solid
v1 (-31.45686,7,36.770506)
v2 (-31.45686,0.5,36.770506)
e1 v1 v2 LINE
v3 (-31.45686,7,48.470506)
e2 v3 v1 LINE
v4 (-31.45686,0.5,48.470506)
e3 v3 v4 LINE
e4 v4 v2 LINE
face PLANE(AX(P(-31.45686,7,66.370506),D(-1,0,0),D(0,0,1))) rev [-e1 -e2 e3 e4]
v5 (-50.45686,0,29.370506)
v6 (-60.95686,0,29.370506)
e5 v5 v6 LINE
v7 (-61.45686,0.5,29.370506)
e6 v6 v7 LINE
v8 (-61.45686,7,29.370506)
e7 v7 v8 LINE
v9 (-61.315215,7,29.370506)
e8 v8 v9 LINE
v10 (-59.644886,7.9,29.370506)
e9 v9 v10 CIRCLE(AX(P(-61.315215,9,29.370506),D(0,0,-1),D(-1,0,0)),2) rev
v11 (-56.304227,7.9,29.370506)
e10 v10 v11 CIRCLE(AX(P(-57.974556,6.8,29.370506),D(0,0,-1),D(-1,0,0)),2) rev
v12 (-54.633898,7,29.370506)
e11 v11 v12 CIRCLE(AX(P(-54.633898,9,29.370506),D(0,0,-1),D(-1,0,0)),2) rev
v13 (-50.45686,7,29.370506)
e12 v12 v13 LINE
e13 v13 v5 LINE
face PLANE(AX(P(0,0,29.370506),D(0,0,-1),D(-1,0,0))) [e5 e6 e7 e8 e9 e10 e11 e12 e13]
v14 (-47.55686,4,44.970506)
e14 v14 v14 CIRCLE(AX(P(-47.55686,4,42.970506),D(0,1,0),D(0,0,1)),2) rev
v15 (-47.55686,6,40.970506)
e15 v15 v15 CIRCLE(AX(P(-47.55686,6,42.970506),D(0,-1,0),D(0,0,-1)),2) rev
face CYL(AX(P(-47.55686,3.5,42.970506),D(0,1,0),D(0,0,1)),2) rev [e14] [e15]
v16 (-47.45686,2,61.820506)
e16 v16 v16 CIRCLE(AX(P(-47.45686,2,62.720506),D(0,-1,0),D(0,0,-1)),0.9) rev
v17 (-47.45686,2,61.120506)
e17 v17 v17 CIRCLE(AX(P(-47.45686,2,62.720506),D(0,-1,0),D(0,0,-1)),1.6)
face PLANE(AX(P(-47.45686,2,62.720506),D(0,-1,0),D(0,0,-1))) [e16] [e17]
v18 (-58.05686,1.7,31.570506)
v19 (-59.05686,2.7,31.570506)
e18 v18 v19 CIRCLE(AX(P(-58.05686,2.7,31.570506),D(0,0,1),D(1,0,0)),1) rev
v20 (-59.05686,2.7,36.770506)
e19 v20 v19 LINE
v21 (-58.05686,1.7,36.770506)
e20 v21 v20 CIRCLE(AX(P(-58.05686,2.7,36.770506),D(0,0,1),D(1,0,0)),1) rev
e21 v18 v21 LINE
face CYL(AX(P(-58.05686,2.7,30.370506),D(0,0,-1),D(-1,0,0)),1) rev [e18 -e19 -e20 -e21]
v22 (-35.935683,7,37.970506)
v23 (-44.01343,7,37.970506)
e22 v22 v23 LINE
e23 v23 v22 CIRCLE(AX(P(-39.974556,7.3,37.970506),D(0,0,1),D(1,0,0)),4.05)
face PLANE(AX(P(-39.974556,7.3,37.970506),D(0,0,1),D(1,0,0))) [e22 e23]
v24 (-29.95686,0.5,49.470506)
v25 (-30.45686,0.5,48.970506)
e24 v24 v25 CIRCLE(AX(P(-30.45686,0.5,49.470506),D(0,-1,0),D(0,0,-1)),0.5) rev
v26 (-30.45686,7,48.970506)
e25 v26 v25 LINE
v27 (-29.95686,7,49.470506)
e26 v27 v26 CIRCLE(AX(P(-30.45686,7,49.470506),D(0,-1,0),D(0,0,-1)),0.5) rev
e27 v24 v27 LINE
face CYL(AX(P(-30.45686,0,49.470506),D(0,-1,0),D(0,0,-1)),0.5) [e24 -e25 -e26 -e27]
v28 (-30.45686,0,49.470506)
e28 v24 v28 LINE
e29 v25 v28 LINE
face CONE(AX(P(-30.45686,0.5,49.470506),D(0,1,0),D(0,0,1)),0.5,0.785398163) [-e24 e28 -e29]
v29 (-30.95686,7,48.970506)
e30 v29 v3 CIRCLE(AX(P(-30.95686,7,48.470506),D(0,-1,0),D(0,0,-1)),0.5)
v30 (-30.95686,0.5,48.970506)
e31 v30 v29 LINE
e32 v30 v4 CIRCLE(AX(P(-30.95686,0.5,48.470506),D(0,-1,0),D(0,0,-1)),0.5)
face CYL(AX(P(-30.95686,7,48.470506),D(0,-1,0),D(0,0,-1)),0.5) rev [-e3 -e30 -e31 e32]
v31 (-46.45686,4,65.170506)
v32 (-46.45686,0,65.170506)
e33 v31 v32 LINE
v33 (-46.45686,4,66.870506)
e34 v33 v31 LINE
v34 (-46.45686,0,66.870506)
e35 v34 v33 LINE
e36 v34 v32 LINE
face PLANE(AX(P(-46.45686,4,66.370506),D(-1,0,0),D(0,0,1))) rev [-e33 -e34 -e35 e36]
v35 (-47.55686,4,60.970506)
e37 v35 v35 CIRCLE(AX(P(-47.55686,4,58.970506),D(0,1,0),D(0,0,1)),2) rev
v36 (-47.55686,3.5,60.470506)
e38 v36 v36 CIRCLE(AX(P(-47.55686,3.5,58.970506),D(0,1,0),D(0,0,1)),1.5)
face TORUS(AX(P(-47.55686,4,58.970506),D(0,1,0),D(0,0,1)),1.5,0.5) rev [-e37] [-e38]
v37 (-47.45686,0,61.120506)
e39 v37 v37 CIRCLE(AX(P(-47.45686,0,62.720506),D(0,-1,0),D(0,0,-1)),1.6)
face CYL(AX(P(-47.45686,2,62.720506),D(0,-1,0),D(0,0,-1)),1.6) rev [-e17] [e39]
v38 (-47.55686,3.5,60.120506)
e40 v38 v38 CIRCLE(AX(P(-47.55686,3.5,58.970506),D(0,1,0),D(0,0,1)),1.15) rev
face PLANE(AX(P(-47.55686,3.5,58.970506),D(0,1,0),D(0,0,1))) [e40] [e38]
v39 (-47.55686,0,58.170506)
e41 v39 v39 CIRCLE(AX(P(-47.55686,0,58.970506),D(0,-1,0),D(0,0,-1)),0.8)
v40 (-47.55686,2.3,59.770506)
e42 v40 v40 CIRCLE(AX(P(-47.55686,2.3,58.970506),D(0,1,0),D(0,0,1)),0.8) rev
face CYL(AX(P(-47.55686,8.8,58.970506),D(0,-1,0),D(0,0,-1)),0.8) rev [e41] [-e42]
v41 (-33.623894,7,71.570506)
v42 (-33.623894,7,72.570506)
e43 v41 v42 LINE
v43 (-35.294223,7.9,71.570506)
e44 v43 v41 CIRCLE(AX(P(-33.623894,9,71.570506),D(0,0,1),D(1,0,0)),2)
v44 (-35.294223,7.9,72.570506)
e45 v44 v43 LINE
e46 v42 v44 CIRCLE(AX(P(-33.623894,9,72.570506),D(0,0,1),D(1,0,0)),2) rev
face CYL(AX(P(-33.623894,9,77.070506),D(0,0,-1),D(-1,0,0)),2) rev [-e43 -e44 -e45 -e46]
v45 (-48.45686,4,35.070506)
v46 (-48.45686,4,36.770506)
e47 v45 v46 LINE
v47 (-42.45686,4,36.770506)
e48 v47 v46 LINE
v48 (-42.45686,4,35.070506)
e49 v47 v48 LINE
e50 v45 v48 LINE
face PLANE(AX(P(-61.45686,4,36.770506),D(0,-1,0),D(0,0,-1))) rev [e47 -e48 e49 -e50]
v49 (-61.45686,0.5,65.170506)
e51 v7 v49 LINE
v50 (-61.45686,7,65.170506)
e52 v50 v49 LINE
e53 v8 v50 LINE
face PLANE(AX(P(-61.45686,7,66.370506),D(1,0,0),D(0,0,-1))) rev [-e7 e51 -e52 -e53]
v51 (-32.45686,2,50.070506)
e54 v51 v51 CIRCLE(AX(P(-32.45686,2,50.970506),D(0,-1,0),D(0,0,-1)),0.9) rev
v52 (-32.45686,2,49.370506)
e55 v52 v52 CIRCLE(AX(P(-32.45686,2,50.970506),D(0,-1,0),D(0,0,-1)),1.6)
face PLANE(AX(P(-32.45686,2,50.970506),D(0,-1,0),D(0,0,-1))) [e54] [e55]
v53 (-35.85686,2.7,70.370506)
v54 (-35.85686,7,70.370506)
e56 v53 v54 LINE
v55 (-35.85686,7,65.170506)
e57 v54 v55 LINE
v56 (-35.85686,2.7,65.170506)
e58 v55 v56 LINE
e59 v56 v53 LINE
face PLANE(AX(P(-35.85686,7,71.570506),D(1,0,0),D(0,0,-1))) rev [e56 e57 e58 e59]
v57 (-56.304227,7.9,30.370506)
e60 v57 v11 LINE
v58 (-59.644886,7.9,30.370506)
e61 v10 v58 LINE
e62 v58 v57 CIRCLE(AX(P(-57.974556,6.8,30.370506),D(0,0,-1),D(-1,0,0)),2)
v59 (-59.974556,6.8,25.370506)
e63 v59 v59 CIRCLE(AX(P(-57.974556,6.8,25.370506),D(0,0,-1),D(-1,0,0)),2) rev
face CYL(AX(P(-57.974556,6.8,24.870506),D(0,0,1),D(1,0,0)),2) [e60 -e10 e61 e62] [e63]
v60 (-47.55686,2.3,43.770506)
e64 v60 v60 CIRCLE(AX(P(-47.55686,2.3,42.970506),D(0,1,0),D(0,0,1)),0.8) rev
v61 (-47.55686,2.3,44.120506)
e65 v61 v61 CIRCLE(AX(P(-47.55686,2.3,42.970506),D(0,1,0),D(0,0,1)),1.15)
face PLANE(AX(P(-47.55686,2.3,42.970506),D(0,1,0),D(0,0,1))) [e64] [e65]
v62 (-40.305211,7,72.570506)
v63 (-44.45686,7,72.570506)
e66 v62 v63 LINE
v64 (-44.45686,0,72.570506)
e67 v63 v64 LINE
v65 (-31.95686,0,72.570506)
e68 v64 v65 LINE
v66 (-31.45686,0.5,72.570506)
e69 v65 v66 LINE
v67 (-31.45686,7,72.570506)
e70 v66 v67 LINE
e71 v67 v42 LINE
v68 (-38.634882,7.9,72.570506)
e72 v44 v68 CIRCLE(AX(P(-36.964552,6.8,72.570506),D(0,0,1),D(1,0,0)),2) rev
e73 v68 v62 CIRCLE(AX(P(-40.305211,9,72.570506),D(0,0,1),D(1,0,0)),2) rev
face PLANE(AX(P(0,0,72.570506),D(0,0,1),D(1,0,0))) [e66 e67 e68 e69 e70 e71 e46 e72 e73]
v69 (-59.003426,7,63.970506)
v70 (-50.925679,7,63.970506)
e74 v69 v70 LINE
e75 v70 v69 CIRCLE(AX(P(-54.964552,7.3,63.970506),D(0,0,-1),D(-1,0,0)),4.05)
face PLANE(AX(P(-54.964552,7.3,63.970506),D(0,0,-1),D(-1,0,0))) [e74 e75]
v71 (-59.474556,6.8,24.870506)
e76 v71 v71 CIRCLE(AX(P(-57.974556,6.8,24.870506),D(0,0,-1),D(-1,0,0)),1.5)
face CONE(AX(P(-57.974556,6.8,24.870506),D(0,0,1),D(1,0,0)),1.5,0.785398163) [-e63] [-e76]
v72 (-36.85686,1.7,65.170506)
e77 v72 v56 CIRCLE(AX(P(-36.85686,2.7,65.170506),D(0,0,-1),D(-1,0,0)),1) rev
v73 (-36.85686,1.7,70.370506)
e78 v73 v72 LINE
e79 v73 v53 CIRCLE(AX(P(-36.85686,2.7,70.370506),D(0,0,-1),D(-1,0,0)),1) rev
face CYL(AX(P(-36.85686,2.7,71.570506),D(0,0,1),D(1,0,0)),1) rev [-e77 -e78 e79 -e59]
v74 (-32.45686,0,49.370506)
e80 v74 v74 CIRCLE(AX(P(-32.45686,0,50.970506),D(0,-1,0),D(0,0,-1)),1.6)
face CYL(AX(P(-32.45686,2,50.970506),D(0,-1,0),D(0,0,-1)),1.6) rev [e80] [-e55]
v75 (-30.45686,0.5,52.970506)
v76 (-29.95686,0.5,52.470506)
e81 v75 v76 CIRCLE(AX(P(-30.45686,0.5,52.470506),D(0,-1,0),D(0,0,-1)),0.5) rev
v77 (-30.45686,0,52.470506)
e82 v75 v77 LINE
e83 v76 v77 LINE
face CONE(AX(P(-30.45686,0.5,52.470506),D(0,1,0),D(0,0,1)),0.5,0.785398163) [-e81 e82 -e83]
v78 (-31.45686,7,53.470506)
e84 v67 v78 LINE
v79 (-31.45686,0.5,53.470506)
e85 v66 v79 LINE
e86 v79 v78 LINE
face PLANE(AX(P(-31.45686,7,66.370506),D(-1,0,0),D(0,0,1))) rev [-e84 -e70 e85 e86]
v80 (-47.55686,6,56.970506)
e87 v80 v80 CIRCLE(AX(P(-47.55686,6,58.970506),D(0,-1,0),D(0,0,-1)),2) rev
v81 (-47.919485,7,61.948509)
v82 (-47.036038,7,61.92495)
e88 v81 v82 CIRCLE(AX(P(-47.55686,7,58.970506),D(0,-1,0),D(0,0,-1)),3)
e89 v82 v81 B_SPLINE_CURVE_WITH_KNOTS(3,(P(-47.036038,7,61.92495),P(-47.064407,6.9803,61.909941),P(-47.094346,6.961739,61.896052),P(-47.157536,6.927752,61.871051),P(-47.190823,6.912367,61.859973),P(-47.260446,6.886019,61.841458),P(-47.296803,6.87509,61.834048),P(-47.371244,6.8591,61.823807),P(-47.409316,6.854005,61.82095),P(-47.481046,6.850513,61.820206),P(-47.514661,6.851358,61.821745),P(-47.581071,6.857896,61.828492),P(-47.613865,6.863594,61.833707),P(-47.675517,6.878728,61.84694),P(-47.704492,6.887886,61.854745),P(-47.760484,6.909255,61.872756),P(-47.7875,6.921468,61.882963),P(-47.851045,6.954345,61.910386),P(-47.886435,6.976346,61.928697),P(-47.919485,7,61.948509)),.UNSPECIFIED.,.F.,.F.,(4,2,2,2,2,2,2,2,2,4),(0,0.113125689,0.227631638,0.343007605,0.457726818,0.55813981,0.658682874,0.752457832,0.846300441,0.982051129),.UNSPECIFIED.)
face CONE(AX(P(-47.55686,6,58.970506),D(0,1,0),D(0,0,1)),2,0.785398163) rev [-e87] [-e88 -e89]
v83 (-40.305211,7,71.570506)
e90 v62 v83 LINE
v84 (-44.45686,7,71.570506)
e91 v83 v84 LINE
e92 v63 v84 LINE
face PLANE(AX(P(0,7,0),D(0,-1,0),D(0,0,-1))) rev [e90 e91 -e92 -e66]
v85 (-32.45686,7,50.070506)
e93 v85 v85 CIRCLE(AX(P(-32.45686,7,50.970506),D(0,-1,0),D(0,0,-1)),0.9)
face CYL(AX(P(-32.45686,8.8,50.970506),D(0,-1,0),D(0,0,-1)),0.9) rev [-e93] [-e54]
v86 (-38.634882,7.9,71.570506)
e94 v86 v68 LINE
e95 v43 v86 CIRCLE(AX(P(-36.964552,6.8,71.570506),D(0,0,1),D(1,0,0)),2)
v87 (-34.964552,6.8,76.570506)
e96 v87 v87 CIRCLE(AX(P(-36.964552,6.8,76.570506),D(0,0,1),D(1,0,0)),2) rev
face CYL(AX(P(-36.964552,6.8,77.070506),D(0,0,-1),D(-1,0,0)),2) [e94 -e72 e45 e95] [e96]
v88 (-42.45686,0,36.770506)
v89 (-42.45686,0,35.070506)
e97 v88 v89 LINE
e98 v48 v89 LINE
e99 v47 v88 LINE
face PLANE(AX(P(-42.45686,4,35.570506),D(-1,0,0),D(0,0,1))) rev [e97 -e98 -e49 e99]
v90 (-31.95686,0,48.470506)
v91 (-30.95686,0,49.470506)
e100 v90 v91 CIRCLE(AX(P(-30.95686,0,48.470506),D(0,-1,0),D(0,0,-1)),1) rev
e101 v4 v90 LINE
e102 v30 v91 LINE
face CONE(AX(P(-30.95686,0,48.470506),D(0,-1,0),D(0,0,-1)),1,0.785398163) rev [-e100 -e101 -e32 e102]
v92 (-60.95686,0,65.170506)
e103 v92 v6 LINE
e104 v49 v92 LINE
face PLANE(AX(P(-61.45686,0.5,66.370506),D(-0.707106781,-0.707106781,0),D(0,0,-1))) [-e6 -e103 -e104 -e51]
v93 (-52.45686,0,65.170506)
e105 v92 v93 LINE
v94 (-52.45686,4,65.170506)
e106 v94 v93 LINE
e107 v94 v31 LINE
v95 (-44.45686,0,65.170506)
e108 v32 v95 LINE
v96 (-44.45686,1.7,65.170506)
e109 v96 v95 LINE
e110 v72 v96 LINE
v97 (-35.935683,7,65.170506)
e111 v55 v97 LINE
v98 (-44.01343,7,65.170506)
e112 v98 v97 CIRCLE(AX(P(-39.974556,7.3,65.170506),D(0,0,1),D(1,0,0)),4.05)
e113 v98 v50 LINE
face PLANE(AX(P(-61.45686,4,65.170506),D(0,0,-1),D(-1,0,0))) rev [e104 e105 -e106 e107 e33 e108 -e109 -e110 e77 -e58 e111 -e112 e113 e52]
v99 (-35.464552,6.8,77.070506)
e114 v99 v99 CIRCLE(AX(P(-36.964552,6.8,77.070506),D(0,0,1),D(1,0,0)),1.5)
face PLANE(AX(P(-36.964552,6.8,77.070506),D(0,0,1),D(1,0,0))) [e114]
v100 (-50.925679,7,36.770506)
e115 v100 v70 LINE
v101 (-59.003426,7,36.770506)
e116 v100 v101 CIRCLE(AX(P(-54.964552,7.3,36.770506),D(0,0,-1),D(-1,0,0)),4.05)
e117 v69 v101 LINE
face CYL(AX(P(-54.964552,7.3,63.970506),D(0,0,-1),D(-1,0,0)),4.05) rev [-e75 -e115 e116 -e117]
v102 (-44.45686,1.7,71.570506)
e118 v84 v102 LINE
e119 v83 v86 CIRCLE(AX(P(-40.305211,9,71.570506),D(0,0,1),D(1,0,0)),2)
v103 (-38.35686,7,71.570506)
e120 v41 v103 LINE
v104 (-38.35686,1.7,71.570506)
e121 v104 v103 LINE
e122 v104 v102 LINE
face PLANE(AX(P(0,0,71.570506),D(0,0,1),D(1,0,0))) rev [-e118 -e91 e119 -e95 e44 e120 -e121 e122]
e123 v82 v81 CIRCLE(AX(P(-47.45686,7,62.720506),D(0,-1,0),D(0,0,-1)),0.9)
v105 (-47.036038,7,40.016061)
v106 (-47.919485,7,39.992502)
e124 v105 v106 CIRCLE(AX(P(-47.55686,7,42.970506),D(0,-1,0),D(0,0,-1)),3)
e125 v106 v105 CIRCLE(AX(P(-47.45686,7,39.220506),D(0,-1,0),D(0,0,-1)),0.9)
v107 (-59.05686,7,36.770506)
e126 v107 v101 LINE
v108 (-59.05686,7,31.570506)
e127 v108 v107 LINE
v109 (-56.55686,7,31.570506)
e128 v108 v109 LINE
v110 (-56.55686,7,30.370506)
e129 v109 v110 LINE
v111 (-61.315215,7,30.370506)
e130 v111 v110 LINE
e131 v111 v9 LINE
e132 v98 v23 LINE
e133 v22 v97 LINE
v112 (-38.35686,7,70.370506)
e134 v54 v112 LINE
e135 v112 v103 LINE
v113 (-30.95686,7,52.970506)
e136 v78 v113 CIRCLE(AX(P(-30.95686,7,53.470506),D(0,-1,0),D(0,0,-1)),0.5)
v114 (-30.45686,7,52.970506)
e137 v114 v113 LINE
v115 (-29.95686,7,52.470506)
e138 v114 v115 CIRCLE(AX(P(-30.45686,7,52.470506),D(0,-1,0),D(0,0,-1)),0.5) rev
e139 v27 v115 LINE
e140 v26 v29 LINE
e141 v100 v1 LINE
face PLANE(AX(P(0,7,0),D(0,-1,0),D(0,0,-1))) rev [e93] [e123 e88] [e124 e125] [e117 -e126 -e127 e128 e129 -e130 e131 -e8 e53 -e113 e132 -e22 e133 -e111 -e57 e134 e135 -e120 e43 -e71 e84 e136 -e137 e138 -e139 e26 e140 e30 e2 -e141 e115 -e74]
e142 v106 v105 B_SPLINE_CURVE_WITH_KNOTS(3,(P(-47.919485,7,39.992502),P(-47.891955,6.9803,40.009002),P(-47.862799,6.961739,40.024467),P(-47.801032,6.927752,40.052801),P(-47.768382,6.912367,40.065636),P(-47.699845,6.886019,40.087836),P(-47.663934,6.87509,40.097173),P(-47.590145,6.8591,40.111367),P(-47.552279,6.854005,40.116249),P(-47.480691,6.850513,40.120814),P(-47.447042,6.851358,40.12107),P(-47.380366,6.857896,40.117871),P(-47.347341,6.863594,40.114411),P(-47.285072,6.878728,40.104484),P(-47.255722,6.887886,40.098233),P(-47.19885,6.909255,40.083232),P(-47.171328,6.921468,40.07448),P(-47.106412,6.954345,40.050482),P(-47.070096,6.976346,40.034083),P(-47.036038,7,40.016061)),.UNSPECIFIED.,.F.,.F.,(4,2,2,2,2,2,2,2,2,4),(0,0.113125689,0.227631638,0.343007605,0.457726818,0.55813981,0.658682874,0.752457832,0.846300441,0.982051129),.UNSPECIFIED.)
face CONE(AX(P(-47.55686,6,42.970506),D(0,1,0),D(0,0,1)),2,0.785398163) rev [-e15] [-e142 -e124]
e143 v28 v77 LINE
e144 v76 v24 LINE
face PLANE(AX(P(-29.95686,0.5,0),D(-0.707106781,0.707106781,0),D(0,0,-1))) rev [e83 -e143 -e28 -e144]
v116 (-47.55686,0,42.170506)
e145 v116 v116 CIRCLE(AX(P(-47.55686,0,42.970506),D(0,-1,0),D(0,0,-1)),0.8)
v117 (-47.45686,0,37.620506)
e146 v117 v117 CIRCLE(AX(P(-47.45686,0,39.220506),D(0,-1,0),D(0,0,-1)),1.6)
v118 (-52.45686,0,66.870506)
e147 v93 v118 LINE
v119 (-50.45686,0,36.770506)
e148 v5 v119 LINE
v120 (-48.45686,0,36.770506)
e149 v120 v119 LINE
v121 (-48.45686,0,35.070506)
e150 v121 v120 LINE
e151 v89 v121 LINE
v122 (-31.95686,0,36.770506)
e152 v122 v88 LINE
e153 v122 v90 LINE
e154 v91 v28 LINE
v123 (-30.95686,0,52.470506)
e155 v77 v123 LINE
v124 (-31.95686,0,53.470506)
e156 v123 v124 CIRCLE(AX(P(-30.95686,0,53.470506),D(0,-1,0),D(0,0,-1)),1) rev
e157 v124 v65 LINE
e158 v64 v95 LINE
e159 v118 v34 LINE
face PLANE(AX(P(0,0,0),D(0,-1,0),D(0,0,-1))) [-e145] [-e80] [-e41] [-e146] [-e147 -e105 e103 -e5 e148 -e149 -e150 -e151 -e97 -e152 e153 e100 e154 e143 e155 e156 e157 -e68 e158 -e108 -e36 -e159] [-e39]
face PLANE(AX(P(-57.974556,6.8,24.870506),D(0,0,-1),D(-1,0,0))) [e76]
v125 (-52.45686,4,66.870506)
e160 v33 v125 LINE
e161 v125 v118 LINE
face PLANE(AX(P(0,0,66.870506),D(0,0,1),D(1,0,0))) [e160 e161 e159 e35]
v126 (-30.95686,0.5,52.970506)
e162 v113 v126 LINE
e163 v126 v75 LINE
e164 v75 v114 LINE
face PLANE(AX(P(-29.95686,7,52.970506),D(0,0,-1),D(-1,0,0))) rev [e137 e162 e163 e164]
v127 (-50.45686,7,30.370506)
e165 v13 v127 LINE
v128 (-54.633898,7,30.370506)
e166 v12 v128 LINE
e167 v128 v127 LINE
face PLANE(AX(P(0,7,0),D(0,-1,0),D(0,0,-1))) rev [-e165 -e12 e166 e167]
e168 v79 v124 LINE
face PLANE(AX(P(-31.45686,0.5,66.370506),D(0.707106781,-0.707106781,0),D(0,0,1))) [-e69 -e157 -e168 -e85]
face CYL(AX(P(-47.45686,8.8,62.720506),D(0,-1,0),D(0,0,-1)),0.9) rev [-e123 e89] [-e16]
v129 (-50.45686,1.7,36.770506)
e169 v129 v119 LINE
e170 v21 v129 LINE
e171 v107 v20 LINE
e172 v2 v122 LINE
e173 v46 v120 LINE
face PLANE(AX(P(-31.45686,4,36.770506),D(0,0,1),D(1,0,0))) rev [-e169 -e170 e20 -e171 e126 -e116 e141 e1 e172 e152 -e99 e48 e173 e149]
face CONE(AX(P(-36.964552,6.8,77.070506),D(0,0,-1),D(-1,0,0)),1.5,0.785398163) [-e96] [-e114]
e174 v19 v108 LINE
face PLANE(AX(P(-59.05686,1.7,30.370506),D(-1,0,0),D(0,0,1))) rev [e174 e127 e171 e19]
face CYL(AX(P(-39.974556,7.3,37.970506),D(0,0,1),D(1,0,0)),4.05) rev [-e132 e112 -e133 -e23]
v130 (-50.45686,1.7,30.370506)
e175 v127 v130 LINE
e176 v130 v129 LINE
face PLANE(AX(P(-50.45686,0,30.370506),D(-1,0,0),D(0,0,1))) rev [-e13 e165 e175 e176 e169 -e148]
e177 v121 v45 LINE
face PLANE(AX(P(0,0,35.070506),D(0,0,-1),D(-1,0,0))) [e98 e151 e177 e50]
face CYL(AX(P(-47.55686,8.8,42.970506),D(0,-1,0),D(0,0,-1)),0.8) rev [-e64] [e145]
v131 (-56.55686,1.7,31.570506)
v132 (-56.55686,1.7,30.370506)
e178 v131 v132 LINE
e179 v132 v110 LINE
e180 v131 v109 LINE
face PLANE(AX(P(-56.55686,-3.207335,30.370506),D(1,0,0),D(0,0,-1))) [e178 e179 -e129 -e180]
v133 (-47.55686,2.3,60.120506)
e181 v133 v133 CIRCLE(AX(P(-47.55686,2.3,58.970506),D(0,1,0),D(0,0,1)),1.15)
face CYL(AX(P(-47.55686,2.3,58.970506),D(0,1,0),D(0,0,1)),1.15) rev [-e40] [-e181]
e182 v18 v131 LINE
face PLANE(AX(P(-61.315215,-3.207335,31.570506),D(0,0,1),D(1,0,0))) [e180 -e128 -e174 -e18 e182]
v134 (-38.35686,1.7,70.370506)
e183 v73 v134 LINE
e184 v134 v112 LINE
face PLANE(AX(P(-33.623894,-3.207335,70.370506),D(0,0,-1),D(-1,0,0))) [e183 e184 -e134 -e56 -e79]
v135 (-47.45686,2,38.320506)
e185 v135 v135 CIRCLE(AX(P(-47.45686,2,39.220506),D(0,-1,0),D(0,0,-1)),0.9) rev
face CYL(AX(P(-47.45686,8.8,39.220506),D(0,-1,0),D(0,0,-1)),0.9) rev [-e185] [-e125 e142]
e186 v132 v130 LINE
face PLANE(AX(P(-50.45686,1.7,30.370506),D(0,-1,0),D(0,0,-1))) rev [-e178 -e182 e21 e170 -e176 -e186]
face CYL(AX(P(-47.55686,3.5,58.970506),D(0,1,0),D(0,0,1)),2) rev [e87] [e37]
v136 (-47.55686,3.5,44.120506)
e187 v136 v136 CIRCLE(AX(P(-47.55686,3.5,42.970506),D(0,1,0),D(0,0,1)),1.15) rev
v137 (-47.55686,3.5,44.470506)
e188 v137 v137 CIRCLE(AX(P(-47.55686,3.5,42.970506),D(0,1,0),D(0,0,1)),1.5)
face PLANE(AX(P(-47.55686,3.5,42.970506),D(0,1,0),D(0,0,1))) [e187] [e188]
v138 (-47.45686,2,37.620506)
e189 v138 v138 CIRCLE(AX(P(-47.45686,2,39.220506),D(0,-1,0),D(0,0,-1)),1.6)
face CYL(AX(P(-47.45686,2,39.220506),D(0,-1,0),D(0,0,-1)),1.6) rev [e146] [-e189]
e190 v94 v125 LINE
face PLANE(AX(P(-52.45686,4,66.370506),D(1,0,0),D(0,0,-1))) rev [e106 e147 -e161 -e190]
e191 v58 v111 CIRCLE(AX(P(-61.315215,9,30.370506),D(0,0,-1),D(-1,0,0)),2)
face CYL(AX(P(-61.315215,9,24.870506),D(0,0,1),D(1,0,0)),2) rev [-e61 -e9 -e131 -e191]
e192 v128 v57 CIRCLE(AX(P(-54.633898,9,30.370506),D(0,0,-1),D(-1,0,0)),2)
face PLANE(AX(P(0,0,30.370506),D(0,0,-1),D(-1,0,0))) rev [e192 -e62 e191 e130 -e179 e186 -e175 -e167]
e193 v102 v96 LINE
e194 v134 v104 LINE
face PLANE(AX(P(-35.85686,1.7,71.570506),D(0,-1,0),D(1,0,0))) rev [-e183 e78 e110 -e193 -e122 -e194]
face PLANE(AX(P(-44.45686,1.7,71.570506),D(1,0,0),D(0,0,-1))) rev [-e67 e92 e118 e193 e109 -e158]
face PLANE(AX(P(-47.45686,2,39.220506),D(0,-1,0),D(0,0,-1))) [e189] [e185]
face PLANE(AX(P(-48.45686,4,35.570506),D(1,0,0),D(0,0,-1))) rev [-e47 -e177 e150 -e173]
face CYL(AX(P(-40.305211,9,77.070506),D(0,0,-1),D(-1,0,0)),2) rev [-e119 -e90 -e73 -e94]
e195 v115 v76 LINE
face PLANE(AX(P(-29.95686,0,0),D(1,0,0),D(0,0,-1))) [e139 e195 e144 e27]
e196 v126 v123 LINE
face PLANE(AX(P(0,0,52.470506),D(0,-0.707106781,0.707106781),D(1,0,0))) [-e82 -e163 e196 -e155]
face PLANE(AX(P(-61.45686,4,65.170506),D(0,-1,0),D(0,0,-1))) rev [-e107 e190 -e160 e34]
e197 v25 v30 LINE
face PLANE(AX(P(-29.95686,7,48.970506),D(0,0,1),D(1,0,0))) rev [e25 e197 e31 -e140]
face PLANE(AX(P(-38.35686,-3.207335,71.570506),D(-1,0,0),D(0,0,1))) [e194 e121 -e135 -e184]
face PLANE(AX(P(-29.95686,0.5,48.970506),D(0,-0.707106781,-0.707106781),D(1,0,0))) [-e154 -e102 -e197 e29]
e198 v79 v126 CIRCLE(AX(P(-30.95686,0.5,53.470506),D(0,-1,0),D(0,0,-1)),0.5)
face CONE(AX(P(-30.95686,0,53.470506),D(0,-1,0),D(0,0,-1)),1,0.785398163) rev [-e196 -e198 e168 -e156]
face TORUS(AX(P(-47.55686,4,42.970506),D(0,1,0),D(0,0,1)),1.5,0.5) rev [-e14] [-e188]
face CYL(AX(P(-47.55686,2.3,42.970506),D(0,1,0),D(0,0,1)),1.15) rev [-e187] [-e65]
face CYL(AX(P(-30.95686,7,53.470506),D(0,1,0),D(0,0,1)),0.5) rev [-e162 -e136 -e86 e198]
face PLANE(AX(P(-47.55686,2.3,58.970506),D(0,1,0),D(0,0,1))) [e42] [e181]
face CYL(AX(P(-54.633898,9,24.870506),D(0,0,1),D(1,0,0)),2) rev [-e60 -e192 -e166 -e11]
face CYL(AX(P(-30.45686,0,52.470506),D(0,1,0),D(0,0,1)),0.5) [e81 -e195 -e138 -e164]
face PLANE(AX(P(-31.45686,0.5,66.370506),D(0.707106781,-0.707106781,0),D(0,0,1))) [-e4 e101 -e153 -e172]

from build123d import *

# Parameters (mm, degrees)
SKETCH1_W            = 30
SKETCH1_H            = 30.8
BOSS_EXTRUDE1_DEPTH  = 7
SKETCH2_R            = 4.05
CUT_EXTRUDE1_DEPTH   = 6.5
SKETCH3_W            = 15
SKETCH3_H            = 1.2
SKETCH3_W_2          = 9
SKETCH3_W_3          = 11
SKETCH3_W_4          = 13
CUT_EXTRUDE2_DEPTH   = 4
SKETCH4_W            = 30
SKETCH4_H            = 3
CUT_EXTRUDE3_DEPTH   = 1.2
SKETCH5_W            = 30
SKETCH5_H            = 3
CUT_EXTRUDE4_DEPTH   = 1.2
SKETCH6_R            = 4.05
CUT_EXTRUDE5_DEPTH   = 27.2
SKETCH7_R            = 4.05
CUT_EXTRUDE6_DEPTH   = 27.2
BOSS_EXTRUDE2_DEPTH  = 6.4
FILLET1_R            = 1
BOSS_EXTRUDE3_DEPTH  = 6.4
FILLET2_R            = 1
SKETCH13_W           = 13
SKETCH13_H           = 7
BOSS_EXTRUDE4_DEPTH  = 1
SKETCH14_W           = 11
SKETCH14_H           = 7
BOSS_EXTRUDE5_DEPTH  = 1
SKETCH15_R           = 2
BOSS_EXTRUDE8_DEPTH  = 5.5
SKETCH16_R           = 2
BOSS_EXTRUDE9_DEPTH  = 5.5
FILLET3_R            = 2
FILLET4_R            = 2
FILLET5_R            = 2
CHAMFER2_SIZE        = 0.5
CHAMFER3_SIZE        = 0.5
SKETCH17_W           = 4
SKETCH17_H           = 7
BOSS_EXTRUDE10_DEPTH = 1.5
FILLET7_R            = 0.5
SKETCH18_R           = 0.9
CUT_EXTRUDE9_DEPTH   = 99.965895754
SKETCH19_R           = 1.6
CUT_EXTRUDE10_DEPTH  = 2
SKETCH20_R           = 0.9
CUT_EXTRUDE11_DEPTH  = 99.965895754
SKETCH21_R           = 1.6
CUT_EXTRUDE12_DEPTH  = 2
CHAMFER6_SIZE        = 0.5
SKETCH22_W           = 6
SKETCH22_H           = 4
BOSS_EXTRUDE11_DEPTH = 0.5
SKETCH23_W           = 6
SKETCH23_H           = 4
BOSS_EXTRUDE12_DEPTH = 0.5
BOSS_EXTRUDE13_REACH = 100.822
SKETCH24_W           = 4.732966807
SKETCH24_H           = 1.2
SKETCH24_W_2         = 4.75835454
SKETCH25_R           = 4.05
BOSS_EXTRUDE14_DEPTH = 7
CUT_EXTRUDE13_START  = 27.2
SKETCH26_R           = 4.05
CUT_EXTRUDE13_DEPTH  = 27.2
CUT_EXTRUDE14_START  = 27.2
SKETCH27_R           = 4.05
CUT_EXTRUDE14_DEPTH  = 27.2
SKETCH28_R           = 0.8
CUT_EXTRUDE15_DEPTH  = 99.965895754
SKETCH30_R           = 1.15
CUT_EXTRUDE16_DEPTH  = 4.7
SKETCH32_R           = 1.15
CUT_EXTRUDE17_DEPTH  = 4.7
SKETCH33_R           = 2
CUT_EXTRUDE18_DEPTH  = 3.5
FILLET8_R            = 0.5
CHAMFER7_SIZE        = 1


# Some blends are built 0.0001 mm under size
with BuildPart() as part:
    # Sketch1 → Boss-Extrude1 (new body)
    with BuildSketch(Plane(origin=(0, 0, 0), x_dir=(1, 0, 0), z_dir=(0, 1, 0))):
        with Locations((-46.45686042, -50.970505576)):
            Rectangle(SKETCH1_W, SKETCH1_H)
    extrude(amount=BOSS_EXTRUDE1_DEPTH)

    # Sketch2 → Cut-Extrude1 (cut)
    with BuildSketch(Plane.XZ):
        with Locations(Location((-47.47186042, 50.970505576, 0), (0, 0, 270))):
            Circle(SKETCH2_R)
    extrude(amount=-CUT_EXTRUDE1_DEPTH, mode=Mode.SUBTRACT)

    # Sketch3 → Cut-Extrude2 (cut)
    with BuildSketch(Plane.XZ):
        with Locations((-38.95686042, 65.770505576)):
            Rectangle(SKETCH3_W, SKETCH3_H)
        with Locations((-56.95686042, 65.770505576)):
            Rectangle(SKETCH3_W_2, SKETCH3_H)
        with Locations((-36.95686042, 36.170505576)):
            Rectangle(SKETCH3_W_3, SKETCH3_H)
        with Locations((-54.95686042, 36.170505576)):
            Rectangle(SKETCH3_W_4, SKETCH3_H)
    extrude(amount=-CUT_EXTRUDE2_DEPTH, mode=Mode.SUBTRACT)

    # Sketch4 → Cut-Extrude3 (cut)
    with BuildSketch(Plane.XY.offset(66.370505576)):
        with Locations((-46.45686042, 5.5)):
            Rectangle(SKETCH4_W, SKETCH4_H)
    extrude(amount=-CUT_EXTRUDE3_DEPTH, mode=Mode.SUBTRACT)

    # Sketch5 → Cut-Extrude4 (cut)
    with BuildSketch(Plane(origin=(0, 0, 35.570505576), x_dir=(-1, 0, 0), z_dir=(0, 0, -1))):
        with Locations((46.45686042, 5.5)):
            Rectangle(SKETCH5_W, SKETCH5_H)
    extrude(amount=-CUT_EXTRUDE4_DEPTH, mode=Mode.SUBTRACT)

    # Sketch6 → Cut-Extrude5 (cut)
    with BuildSketch(Plane.XY.offset(65.170505576)):
        with Locations((-39.974556342, 7.3)):
            Circle(SKETCH6_R)
    extrude(amount=-CUT_EXTRUDE5_DEPTH, mode=Mode.SUBTRACT)

    # Sketch7 → Cut-Extrude6 (cut)
    with BuildSketch(Plane(origin=(0, 0, 36.770505576), x_dir=(-1, 0, 0), z_dir=(0, 0, -1))):
        with Locations((54.96455223, 7.3)):
            Circle(SKETCH7_R)
    extrude(amount=-CUT_EXTRUDE6_DEPTH, mode=Mode.SUBTRACT)

    # Sketch10 → Boss-Extrude2 (add)
    with BuildSketch(Plane.XY.offset(65.170505576)):
        Polygon((-31.45686042, 0), (-31.45686042, 7), (-35.85686042, 7), (-35.85686042, 1.7), (-44.45686042, 1.7), (-44.45686042, 0), align=None)
    extrude(amount=BOSS_EXTRUDE2_DEPTH)

    # Fillet1
    fillet1_edges = [part.edges().sort_by_distance(p)[0] for p in [
        (-35.85686042, 1.7, 68.370505576),
    ]]
    fillet(fillet1_edges, radius=FILLET1_R)

    # Sketch11 → Boss-Extrude3 (add)
    with BuildSketch(Plane(origin=(0, 0, 36.770505576), x_dir=(-1, 0, 0), z_dir=(0, 0, -1))):
        Polygon((61.45686042, 7), (61.45686042, 0), (50.45686042, 0), (50.45686042, 1.7), (59.05686042, 1.7), (59.05686042, 7), align=None)
    extrude(amount=BOSS_EXTRUDE3_DEPTH)

    # Fillet2
    fillet2_edges = [part.edges().sort_by_distance(p)[0] for p in [
        (-59.05686042, 1.7, 33.570505576),
    ]]
    fillet(fillet2_edges, radius=FILLET2_R)

    # Sketch13 → Boss-Extrude4 (add)
    with BuildSketch(Plane.XY.offset(71.570505576)):
        with Locations((-37.95686042, 3.5)):
            Rectangle(SKETCH13_W, SKETCH13_H)
    extrude(amount=BOSS_EXTRUDE4_DEPTH)

    # Sketch14 → Boss-Extrude5 (add)
    with BuildSketch(Plane(origin=(0, 0, 30.370505576), x_dir=(-1, 0, 0), z_dir=(0, 0, -1))):
        with Locations((55.95686042, 3.5)):
            Rectangle(SKETCH14_W, SKETCH14_H)
    extrude(amount=BOSS_EXTRUDE5_DEPTH)

    # Sketch15 → Boss-Extrude8 (add)
    with BuildSketch(Plane.XY.offset(71.570505576)):
        with Locations(Location((-36.96455223, 6.8, 0), (0, 0, 174.260829523))):
            Circle(SKETCH15_R)
    extrude(amount=BOSS_EXTRUDE8_DEPTH)

    # Sketch16 → Boss-Extrude9 (add)
    with BuildSketch(Plane(origin=(0, 0, 30.370505576), x_dir=(-1, 0, 0), z_dir=(0, 0, -1))):
        with Locations(Location((57.974556342, 6.8, 0), (0, 0, 174.260829523))):
            Circle(SKETCH16_R)
    extrude(amount=BOSS_EXTRUDE9_DEPTH)

    # Fillet3
    fillet3_edges = [part.edges().sort_by_distance(p)[0] for p in [
        (-59.964531217, 7, 29.870505576),
    ]]
    fillet(fillet3_edges, radius=FILLET3_R)

    # Fillet4
    # the kernel refuses this fillet: 2 mm, written as the material it adds along each edge
    with BuildSketch(Plane(origin=(-55.984581468, 7, 30.370505576), x_dir=(1.0, 6.928230146476526e-12, 0), z_dir=(0, 0, -1))) as fillet4_piece_1:
        with BuildLine():
            CenterArc((1.350683743, -2), FILLET4_R, 90, 56.632987031)
            ThreePointArc((-0.319645565, -0.9), (-0.105311329, -0.469360383), (0, 0))
            Line((0, 0), (1.350683743, 0))
        make_face()
    extrude(amount=1)

    # Fillet5
    # the kernel refuses this fillet: 2 mm, written as the material it adds along each edge
    with BuildSketch(Plane(origin=(-38.954527104, 7, 71.570505576), x_dir=(0.33468019132383453, 0.9423317725384418, 0), z_dir=(0, 0, 1))) as fillet5_piece_1:
        with BuildLine():
            CenterArc((1.432616451, 1.942152589), FILLET5_R, 199.553091723, 56.632987031)
            Line((-0.452047094, 1.272792206), (0, 0))
            ThreePointArc((0, 0), (0.477538817, 0.057847411), (0.955077634, 0))
        make_face()
    extrude(amount=1)
    with BuildSketch(Plane(origin=(-34.974577356, 7, 72.570505576), x_dir=(1, 0, 0), z_dir=(0, 0, -1))) as fillet5_piece_2:
        with BuildLine():
            CenterArc((1.350683743, -2), FILLET5_R, 90, 56.632987031)
            ThreePointArc((-0.319645565, -0.9), (-0.105311329, -0.469360383), (0, 0))
            Line((0, 0), (1.350683743, 0))
        make_face()
    extrude(amount=1)

    # Chamfer2
    chamfer2_edges = [part.edges().sort_by_distance(p)[0] for p in [
        (-34.974577356, 6.6, 77.070505576),
    ]]
    chamfer(chamfer2_edges, length=CHAMFER2_SIZE)

    # Chamfer3
    chamfer3_edges = [part.edges().sort_by_distance(p)[0] for p in [
        (-59.964531217, 6.6, 24.870505576),
    ]]
    chamfer(chamfer3_edges, length=CHAMFER3_SIZE)

    # Sketch17 → Boss-Extrude10 (add)
    with BuildSketch(Plane(origin=(-31.45686042, 0, 0), x_dir=(0, 0, -1), z_dir=(1, 0, 0))):
        with Locations((-50.970505576, 3.5)):
            Rectangle(SKETCH17_W, SKETCH17_H)
    extrude(amount=BOSS_EXTRUDE10_DEPTH)

    # Fillet7
    fillet7_edges = [part.edges().sort_by_distance(p)[0] for p in [
        (-31.45686042, 3.5, 52.970505576),
        (-31.45686042, 3.5, 48.970505576),
        (-29.95686042, 3.5, 52.970505576),
        (-29.95686042, 3.5, 48.970505576),
    ]]
    fillet(fillet7_edges, radius=FILLET7_R)

    # Sketch18 → Cut-Extrude9 (cut, through all)
    with BuildSketch(Plane.XZ):
        with Locations(Location((-32.45686042, 50.970505576, 0), (0, 0, 270))):
            Circle(SKETCH18_R)
    extrude(amount=-CUT_EXTRUDE9_DEPTH, mode=Mode.SUBTRACT)

    # Sketch19 → Cut-Extrude10 (cut)
    with BuildSketch(Plane.XZ):
        with Locations(Location((-32.45686042, 50.970505576, 0), (0, 0, 270))):
            Circle(SKETCH19_R)
    extrude(amount=-CUT_EXTRUDE10_DEPTH, mode=Mode.SUBTRACT)

    # Sketch20 → Cut-Extrude11 (cut, through all)
    with BuildSketch(Plane.XZ):
        with Locations(Location((-47.45686042, 62.720505576, 0), (0, 0, 270))):
            Circle(SKETCH20_R)
        with Locations(Location((-47.45686042, 39.220505576, 0), (0, 0, 270))):
            Circle(SKETCH20_R)
    extrude(amount=-CUT_EXTRUDE11_DEPTH, mode=Mode.SUBTRACT)

    # Sketch21 → Cut-Extrude12 (cut)
    with BuildSketch(Plane.XZ):
        with Locations(Location((-47.45686042, 62.720505576, 0), (0, 0, 270))):
            Circle(SKETCH21_R)
        with Locations(Location((-47.45686042, 39.220505576, 0), (0, 0, 270))):
            Circle(SKETCH21_R)
    extrude(amount=-CUT_EXTRUDE12_DEPTH, mode=Mode.SUBTRACT)

    # Chamfer6
    chamfer6_edges = [part.edges().sort_by_distance(p)[0] for p in [
        (-61.45686042, 0, 47.270505576),
        (-31.45686042, 0, 42.620505576),
        (-31.310413811, 0, 48.824058967),
        (-30.70686042, 0, 48.970505576),
        (-30.103307029, 0, 49.116952185),
        (-29.95686042, 0, 50.970505576),
        (-30.103307029, 0, 52.824058967),
        (-30.70686042, 0, 52.970505576),
        (-31.310413811, 0, 53.116952185),
    ]]
    chamfer(chamfer6_edges, length=CHAMFER6_SIZE - 0.0001)  # a hair under: the kernel refuses the full size

    # Sketch22 → Boss-Extrude11 (add)
    with BuildSketch(Plane(origin=(0, 0, 35.570505576), x_dir=(-1, 0, 0), z_dir=(0, 0, -1))):
        with Locations((45.45686042, 2)):
            Rectangle(SKETCH22_W, SKETCH22_H)
    extrude(amount=BOSS_EXTRUDE11_DEPTH)

    # Sketch23 → Boss-Extrude12 (add)
    with BuildSketch(Plane.XY.offset(66.370505576)):
        with Locations((-49.45686042, 2)):
            Rectangle(SKETCH23_W, SKETCH23_H)
    extrude(amount=BOSS_EXTRUDE12_DEPTH)

    # Boss-Extrude13: up to this face of the body (flat: up to its plane)
    boss_extrude13_end = Plane(part.part.faces().sort_by_distance((-54.25686042, 1.7, 33.570505576))[0])
    # Sketch24 → Boss-Extrude13 (add, up to the picked face)
    with BuildSketch(Plane(origin=(0, 7, 0), x_dir=(1, 0, 0), z_dir=(0, 1, 0)), mode=Mode.PRIVATE) as boss_extrude13_sk1:
        with Locations((-35.990377017, -70.970505576)):
            Rectangle(SKETCH24_W, SKETCH24_H)
    boss_extrude13_tool1 = split(extrude(boss_extrude13_sk1.sketch, amount=-BOSS_EXTRUDE13_REACH, mode=Mode.PRIVATE), bisect_by=boss_extrude13_end, keep=Keep.BOTH, mode=Mode.PRIVATE)
    # Sketch24 → Boss-Extrude13 (add, up to the picked face)
    with BuildSketch(Plane(origin=(0, 7, 0), x_dir=(1, 0, 0), z_dir=(0, 1, 0)), mode=Mode.PRIVATE) as boss_extrude13_sk2:
        with Locations((-58.93603769, -30.970505576)):
            Rectangle(SKETCH24_W_2, SKETCH24_H)
    boss_extrude13_tool2 = split(extrude(boss_extrude13_sk2.sketch, amount=-BOSS_EXTRUDE13_REACH, mode=Mode.PRIVATE), bisect_by=boss_extrude13_end, keep=Keep.BOTH, mode=Mode.PRIVATE)
    add(boss_extrude13_tool1.solids().sort_by(Axis((-35.990377, 7, 70.970506), (0, -1, 0)))[0])
    add(boss_extrude13_tool2.solids().sort_by(Axis((-58.936038, 7, 30.970506), (0, -1, 0)))[0])

    # Sketch25 → Boss-Extrude14 (add)
    with BuildSketch(Plane.XZ):
        with Locations((-47.47186042, 50.970505576)):
            Circle(SKETCH25_R)
    extrude(amount=-BOSS_EXTRUDE14_DEPTH)

    # Sketch26 → Cut-Extrude13 (cut)
    with BuildSketch(Plane.XY.offset(37.970505576).offset(CUT_EXTRUDE13_START)):
        with Locations((-39.974556342, 7.3)):
            Circle(SKETCH26_R)
    extrude(amount=-CUT_EXTRUDE13_DEPTH, mode=Mode.SUBTRACT)

    # Sketch27 → Cut-Extrude14 (cut)
    with BuildSketch(Plane(origin=(0, 0, 63.970505576), x_dir=(-1, 0, 0), z_dir=(0, 0, -1)).offset(CUT_EXTRUDE14_START)):
        with Locations((54.96455223, 7.3)):
            Circle(SKETCH27_R)
    extrude(amount=-CUT_EXTRUDE14_DEPTH, mode=Mode.SUBTRACT)

    # Sketch28 → Cut-Extrude15 (cut, through all)
    with BuildSketch(Plane.XZ):
        with Locations(Location((-47.55686042, 58.970505576, 0), (0, 0, 270))):
            Circle(SKETCH28_R)
        with Locations(Location((-47.55686042, 42.970505576, 0), (0, 0, 270))):
            Circle(SKETCH28_R)
    extrude(amount=-CUT_EXTRUDE15_DEPTH, mode=Mode.SUBTRACT)

    # Sketch30 → Cut-Extrude16 (cut)
    with BuildSketch(Plane(origin=(0, 7, 0), x_dir=(1, 0, 0), z_dir=(0, 1, 0))):
        with Locations(Location((-47.55686042, -42.970505576, 0), (0, 0, 270))):
            Circle(SKETCH30_R)
    extrude(amount=-CUT_EXTRUDE16_DEPTH, mode=Mode.SUBTRACT)

    # Sketch32 → Cut-Extrude17 (cut)
    with BuildSketch(Plane(origin=(0, 7, 0), x_dir=(1, 0, 0), z_dir=(0, 1, 0))):
        with Locations(Location((-47.55686042, -58.970505576, 0), (0, 0, 270))):
            Circle(SKETCH32_R)
    extrude(amount=-CUT_EXTRUDE17_DEPTH, mode=Mode.SUBTRACT)

    # Sketch33 → Cut-Extrude18 (cut)
    with BuildSketch(Plane(origin=(0, 7, 0), x_dir=(1, 0, 0), z_dir=(0, 1, 0))):
        with Locations(Location((-47.55686042, -58.970505576, 0), (0, 0, 270))):
            Circle(SKETCH33_R)
        with Locations(Location((-47.55686042, -42.970505576, 0), (0, 0, 270))):
            Circle(SKETCH33_R)
    extrude(amount=-CUT_EXTRUDE18_DEPTH, mode=Mode.SUBTRACT)

    # Fillet8
    fillet8_edges = [part.edges().sort_by_distance(p)[0] for p in [
        (-47.55686042, 3.5, 56.970505576),
        (-47.55686042, 3.5, 40.970505576),
    ]]
    fillet(fillet8_edges, radius=FILLET8_R)

    # Chamfer7
    # the kernel refuses this chamfer: 1 mm, written as the material it takes off along each edge
    with BuildSketch(Plane(origin=(-47.55686042, 7, 58.970505576), x_dir=(0, 0, 1), z_dir=(-1, 0, 0))) as chamfer7_piece_1:
        Polygon((2, -CHAMFER7_SIZE), (2 + CHAMFER7_SIZE, 0), (2, 0), align=None)
    revolve(axis=Axis((-47.55686042, 7, 58.970505576), (0, 1, 0)), mode=Mode.SUBTRACT)
    with BuildSketch(Plane(origin=(-47.55686042, 7, 42.970505576), x_dir=(0, 0, 1), z_dir=(-1, 0, 0))) as chamfer7_piece_2:
        Polygon((2 + CHAMFER7_SIZE, 0), (2, -CHAMFER7_SIZE), (2, 0), align=None)
    revolve(axis=Axis((-47.55686042, 7, 42.970505576), (0, 1, 0)), mode=Mode.SUBTRACT)


solid = part.part
